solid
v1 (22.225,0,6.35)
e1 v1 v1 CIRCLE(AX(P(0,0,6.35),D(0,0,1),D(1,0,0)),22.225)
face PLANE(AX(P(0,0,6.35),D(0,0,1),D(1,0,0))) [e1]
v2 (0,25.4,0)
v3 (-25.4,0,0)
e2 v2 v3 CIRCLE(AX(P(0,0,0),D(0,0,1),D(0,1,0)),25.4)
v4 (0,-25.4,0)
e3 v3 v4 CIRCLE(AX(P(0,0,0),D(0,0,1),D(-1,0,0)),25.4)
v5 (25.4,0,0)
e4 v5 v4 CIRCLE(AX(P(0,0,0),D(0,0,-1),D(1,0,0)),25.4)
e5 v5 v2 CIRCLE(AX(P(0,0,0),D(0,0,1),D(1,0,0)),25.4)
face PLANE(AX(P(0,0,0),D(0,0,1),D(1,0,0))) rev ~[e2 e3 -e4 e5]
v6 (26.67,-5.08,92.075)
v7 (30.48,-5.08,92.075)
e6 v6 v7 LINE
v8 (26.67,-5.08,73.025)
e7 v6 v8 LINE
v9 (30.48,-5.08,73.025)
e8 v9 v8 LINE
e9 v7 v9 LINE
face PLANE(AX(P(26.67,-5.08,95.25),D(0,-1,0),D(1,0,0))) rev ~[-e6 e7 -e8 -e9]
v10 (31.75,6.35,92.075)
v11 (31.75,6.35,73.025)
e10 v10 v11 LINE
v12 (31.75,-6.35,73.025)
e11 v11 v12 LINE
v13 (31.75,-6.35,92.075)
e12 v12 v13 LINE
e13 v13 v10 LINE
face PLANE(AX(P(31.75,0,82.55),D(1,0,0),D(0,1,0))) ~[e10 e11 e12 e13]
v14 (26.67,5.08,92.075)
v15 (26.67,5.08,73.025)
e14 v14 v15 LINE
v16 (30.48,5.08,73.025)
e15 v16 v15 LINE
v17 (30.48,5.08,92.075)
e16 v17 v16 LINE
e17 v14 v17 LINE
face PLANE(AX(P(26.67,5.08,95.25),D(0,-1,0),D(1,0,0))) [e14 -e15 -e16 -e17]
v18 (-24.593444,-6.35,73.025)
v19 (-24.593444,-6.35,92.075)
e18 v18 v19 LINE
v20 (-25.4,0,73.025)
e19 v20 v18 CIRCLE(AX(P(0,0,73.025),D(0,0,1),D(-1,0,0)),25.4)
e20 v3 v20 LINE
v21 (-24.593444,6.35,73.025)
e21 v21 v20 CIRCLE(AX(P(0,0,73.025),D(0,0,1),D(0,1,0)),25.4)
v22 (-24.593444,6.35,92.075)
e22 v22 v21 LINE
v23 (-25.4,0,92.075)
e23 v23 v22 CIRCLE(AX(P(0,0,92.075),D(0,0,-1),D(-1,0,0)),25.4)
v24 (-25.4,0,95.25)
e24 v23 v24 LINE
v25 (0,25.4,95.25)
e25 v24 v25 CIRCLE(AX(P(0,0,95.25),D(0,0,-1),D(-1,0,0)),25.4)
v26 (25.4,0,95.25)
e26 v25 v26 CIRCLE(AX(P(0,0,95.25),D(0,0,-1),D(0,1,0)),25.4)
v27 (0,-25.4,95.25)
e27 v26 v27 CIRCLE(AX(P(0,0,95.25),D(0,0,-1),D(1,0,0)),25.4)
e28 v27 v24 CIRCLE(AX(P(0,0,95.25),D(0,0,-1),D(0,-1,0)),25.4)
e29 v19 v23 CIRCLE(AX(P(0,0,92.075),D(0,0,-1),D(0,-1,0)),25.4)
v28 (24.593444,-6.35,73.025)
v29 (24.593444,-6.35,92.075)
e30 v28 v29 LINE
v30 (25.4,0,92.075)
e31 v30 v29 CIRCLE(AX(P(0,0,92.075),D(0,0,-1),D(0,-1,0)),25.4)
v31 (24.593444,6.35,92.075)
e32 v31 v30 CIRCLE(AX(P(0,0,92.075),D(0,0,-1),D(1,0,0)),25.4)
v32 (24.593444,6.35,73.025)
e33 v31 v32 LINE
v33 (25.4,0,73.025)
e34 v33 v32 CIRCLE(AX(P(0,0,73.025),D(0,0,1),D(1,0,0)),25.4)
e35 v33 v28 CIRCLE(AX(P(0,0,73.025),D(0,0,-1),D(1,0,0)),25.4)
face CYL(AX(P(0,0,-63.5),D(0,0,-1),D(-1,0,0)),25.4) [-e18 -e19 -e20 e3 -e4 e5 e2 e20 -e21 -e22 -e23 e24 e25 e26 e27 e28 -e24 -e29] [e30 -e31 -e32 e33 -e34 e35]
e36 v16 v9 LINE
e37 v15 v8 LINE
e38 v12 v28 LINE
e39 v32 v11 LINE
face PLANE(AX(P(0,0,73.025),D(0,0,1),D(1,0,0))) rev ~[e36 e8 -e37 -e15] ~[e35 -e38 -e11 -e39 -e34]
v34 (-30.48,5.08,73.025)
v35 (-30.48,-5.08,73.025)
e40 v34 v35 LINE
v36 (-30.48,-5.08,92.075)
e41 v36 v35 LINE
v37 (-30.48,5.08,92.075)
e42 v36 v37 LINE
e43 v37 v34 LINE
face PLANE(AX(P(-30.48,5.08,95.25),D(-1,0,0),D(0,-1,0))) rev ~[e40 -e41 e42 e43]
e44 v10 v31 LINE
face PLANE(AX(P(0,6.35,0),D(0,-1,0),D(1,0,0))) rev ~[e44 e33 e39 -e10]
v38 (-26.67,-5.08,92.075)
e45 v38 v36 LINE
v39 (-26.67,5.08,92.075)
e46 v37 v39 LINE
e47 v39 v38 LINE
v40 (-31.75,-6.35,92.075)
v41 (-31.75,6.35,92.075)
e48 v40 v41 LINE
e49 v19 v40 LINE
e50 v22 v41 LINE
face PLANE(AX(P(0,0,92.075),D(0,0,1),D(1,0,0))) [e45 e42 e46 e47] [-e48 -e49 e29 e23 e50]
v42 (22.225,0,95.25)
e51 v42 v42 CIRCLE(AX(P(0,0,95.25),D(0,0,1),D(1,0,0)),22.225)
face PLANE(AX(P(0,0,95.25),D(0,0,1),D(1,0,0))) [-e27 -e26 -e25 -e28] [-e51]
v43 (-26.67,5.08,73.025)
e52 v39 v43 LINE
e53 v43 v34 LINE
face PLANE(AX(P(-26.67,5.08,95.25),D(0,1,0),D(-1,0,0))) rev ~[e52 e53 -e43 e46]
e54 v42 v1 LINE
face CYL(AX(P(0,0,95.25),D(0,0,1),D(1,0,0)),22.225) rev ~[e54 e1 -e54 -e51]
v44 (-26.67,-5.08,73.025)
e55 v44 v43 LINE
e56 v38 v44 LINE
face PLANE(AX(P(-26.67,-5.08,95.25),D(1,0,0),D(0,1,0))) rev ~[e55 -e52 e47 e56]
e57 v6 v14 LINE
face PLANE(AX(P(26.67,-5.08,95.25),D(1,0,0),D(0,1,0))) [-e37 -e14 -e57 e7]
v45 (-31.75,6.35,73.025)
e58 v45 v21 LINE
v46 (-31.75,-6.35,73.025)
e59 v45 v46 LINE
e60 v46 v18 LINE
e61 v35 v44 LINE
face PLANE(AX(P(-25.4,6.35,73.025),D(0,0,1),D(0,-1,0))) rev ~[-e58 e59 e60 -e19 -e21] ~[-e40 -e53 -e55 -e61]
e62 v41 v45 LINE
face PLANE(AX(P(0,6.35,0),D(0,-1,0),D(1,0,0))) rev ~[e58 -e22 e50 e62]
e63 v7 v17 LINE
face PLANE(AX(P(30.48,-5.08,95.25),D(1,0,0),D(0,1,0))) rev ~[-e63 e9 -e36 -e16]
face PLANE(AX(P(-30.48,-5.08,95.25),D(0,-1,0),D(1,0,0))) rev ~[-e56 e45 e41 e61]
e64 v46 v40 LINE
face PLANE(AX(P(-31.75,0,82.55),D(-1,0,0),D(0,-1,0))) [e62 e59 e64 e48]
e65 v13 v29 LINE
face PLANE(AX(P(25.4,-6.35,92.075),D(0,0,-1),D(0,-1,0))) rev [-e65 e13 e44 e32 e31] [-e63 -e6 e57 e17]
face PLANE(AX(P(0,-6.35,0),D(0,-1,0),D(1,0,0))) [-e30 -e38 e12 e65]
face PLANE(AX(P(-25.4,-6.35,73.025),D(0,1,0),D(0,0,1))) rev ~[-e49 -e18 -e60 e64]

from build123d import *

# Parameters (mm, degrees)
F0_W          = 50.8
F0_H          = 50.8
F1_DEPTH      = 95.25
F3_DEPTH      = 6.35
F5_W          = 3.81
F5_H          = 10.16
F6_DEPTH      = 25.4
F7_T4_DEPTH   = 222.25
F7_T10_DEPTH  = 222.25
F7_T16_DEPTH  = 222.25
F7_T23_DEPTH  = 222.25
F7_T29_DEPTH  = 222.25
F7_T35_DEPTH  = 222.25
F7_T41_DEPTH  = 222.25
F7_T47_DEPTH  = 222.25
F7_T54_DEPTH  = 222.25
F7_T60_DEPTH  = 222.25
F7_T66_DEPTH  = 222.25
F7_T72_DEPTH  = 222.25
F7_T78_DEPTH  = 222.25
F7_T85_DEPTH  = 222.25
F7_T91_DEPTH  = 222.25
F7_T97_DEPTH  = 222.25
F7_T103_DEPTH = 222.25
F7_T109_DEPTH = 222.25
F7_T116_DEPTH = 222.25
F7_T122_DEPTH = 222.25
F8_R          = 22.225
F9_DEPTH      = 88.9


# Not quite as in the source:
# - a fillet or chamfer that OpenCascade refuses, or shapes differently, is made with other operations: its cross-section is extruded or revolved along the edge and cut away or added


with BuildPart() as f1:
    # F0 (on Top) → F1 (new body)
    with BuildSketch(Plane.XY):
        Rectangle(F0_W, F0_H)
    extrude(amount=F1_DEPTH)

    # F2 (on face) → F3 (join)
    with BuildSketch(Plane(origin=(-25.4, 0, 0), x_dir=(0, -1, 0), z_dir=(-1, 0, 0))):
        Polygon((-6.35, 73.025), (6.35, 73.025), (6.35, 92.075), (0, 92.075), (-6.35, 92.075), align=None)
    extrude(amount=F3_DEPTH)

    # F4: F1 across plane


with BuildPart() as f1_1:
    add(f1.part)
    add(f1.part.mirror(Plane.YZ))

    # F5 (on face) → F6 (cut)
    with BuildSketch(Plane.XY.offset(95.25)):
        Polygon((-26.67, -5.08), (-26.67, 0), (-28.575, 0), (-30.48, 0), (-30.48, -5.08), align=None)
        Polygon((-28.575, 0), (-26.67, 0), (-26.67, 5.08), (-30.48, 5.08), (-30.48, 0), align=None)
        with Locations((28.575, 0)):
            Rectangle(F5_W, F5_H)
    extrude(amount=-F6_DEPTH, mode=Mode.SUBTRACT)

    # F7: fillet of radius 25.4 on 4 edges, made by hand


with BuildPart() as f7_tool2:
    # F7_s3 → F7_t4 (new body)
    with BuildSketch(Plane.XY.offset(-63.5)):
        with BuildLine():
            ThreePointArc((0, -25.4), (-17.9605122421, -17.9605122421), (-25.4, 0))
            Line((-25.4, 0), (-25.4, -25.4))
            Line((-25.4, -25.4), (0, -25.4))
        make_face()
    extrude(amount=F7_T4_DEPTH)

    split(bisect_by=Plane.XZ.offset(6.35), keep=Keep.TOP)

    split(bisect_by=Plane.XY.offset(73.025), keep=Keep.BOTTOM)


with BuildPart() as f1_2:
    add(f1_1.part)

    # F7_t1: cut F7_tool2
    add(f7_tool2.part, mode=Mode.SUBTRACT)


with BuildPart() as f7_tool8:
    # F7_s9 → F7_t10 (new body)
    with BuildSketch(Plane.XY.offset(-63.5)):
        with BuildLine():
            ThreePointArc((0, -25.4), (-17.9605122421, -17.9605122421), (-25.4, 0))
            Line((-25.4, 0), (-25.4, -25.4))
            Line((-25.4, -25.4), (0, -25.4))
        make_face()
    extrude(amount=F7_T10_DEPTH)

    split(bisect_by=Plane.XZ.offset(6.35), keep=Keep.BOTTOM)

    split(bisect_by=Plane.XY.offset(73.025), keep=Keep.BOTTOM)


with BuildPart() as f1_3:
    add(f1_2.part)

    # F7_t7: cut F7_tool8
    add(f7_tool8.part, mode=Mode.SUBTRACT)


with BuildPart() as f7_tool14:
    # F7_s15 → F7_t16 (new body)
    with BuildSketch(Plane.XY.offset(-63.5)):
        with BuildLine():
            ThreePointArc((0, -25.4), (-17.9605122421, -17.9605122421), (-25.4, 0))
            Line((-25.4, 0), (-25.4, -25.4))
            Line((-25.4, -25.4), (0, -25.4))
        make_face()
    extrude(amount=F7_T16_DEPTH)

    split(bisect_by=Plane.XY.offset(92.075), keep=Keep.BOTTOM)

    split(bisect_by=Plane.XZ.offset(6.35), keep=Keep.TOP)

    split(bisect_by=Plane.XY.offset(73.025), keep=Keep.TOP)


with BuildPart() as f1_4:
    add(f1_3.part)

    # F7_t13: cut F7_tool14
    add(f7_tool14.part, mode=Mode.SUBTRACT)


with BuildPart() as f7_tool21:
    # F7_s22 → F7_t23 (new body)
    with BuildSketch(Plane.XY.offset(-63.5)):
        with BuildLine():
            ThreePointArc((0, -25.4), (-17.9605122421, -17.9605122421), (-25.4, 0))
            Line((-25.4, 0), (-25.4, -25.4))
            Line((-25.4, -25.4), (0, -25.4))
        make_face()
    extrude(amount=F7_T23_DEPTH)

    split(bisect_by=Plane.XY.offset(92.075), keep=Keep.TOP)

    split(bisect_by=Plane.XZ.offset(6.35), keep=Keep.TOP)


with BuildPart() as f1_5:
    add(f1_4.part)

    # F7_t20: cut F7_tool21
    add(f7_tool21.part, mode=Mode.SUBTRACT)


with BuildPart() as f7_tool27:
    # F7_s28 → F7_t29 (new body)
    with BuildSketch(Plane.XY.offset(-63.5)):
        with BuildLine():
            ThreePointArc((0, -25.4), (-17.9605122421, -17.9605122421), (-25.4, 0))
            Line((-25.4, 0), (-25.4, -25.4))
            Line((-25.4, -25.4), (0, -25.4))
        make_face()
    extrude(amount=F7_T29_DEPTH)

    split(bisect_by=Plane.XY.offset(92.075), keep=Keep.TOP)

    split(bisect_by=Plane.XZ.offset(6.35), keep=Keep.BOTTOM)


with BuildPart() as f1_6:
    add(f1_5.part)

    # F7_t26: cut F7_tool27
    add(f7_tool27.part, mode=Mode.SUBTRACT)


with BuildPart() as f7_tool33:
    # F7_s34 → F7_t35 (new body)
    with BuildSketch(Plane.XY.offset(-63.5)):
        with BuildLine():
            ThreePointArc((0, -25.4), (17.9605122421, -17.9605122421), (25.4, 0))
            Line((25.4, 0), (25.4, -25.4))
            Line((25.4, -25.4), (0, -25.4))
        make_face()
    extrude(amount=F7_T35_DEPTH)

    split(bisect_by=Plane.XY.offset(73.025), keep=Keep.BOTTOM)

    split(bisect_by=Plane.XZ.offset(6.35), keep=Keep.TOP)


with BuildPart() as f1_7:
    add(f1_6.part)

    # F7_t32: cut F7_tool33
    add(f7_tool33.part, mode=Mode.SUBTRACT)


with BuildPart() as f7_tool39:
    # F7_s40 → F7_t41 (new body)
    with BuildSketch(Plane.XY.offset(-63.5)):
        with BuildLine():
            ThreePointArc((0, -25.4), (17.9605122421, -17.9605122421), (25.4, 0))
            Line((25.4, 0), (25.4, -25.4))
            Line((25.4, -25.4), (0, -25.4))
        make_face()
    extrude(amount=F7_T41_DEPTH)

    split(bisect_by=Plane.XY.offset(73.025), keep=Keep.BOTTOM)

    split(bisect_by=Plane.XZ.offset(6.35), keep=Keep.BOTTOM)


with BuildPart() as f1_8:
    add(f1_7.part)

    # F7_t38: cut F7_tool39
    add(f7_tool39.part, mode=Mode.SUBTRACT)


with BuildPart() as f7_tool45:
    # F7_s46 → F7_t47 (new body)
    with BuildSketch(Plane.XY.offset(-63.5)):
        with BuildLine():
            ThreePointArc((0, -25.4), (17.9605122421, -17.9605122421), (25.4, 0))
            Line((25.4, 0), (25.4, -25.4))
            Line((25.4, -25.4), (0, -25.4))
        make_face()
    extrude(amount=F7_T47_DEPTH)

    split(bisect_by=Plane.XY.offset(73.025), keep=Keep.TOP)

    split(bisect_by=Plane.XZ.offset(6.35), keep=Keep.TOP)

    split(bisect_by=Plane.XY.offset(92.075), keep=Keep.BOTTOM)


with BuildPart() as f1_9:
    add(f1_8.part)

    # F7_t44: cut F7_tool45
    add(f7_tool45.part, mode=Mode.SUBTRACT)


with BuildPart() as f7_tool52:
    # F7_s53 → F7_t54 (new body)
    with BuildSketch(Plane.XY.offset(-63.5)):
        with BuildLine():
            ThreePointArc((0, -25.4), (17.9605122421, -17.9605122421), (25.4, 0))
            Line((25.4, 0), (25.4, -25.4))
            Line((25.4, -25.4), (0, -25.4))
        make_face()
    extrude(amount=F7_T54_DEPTH)

    split(bisect_by=Plane.XZ.offset(6.35), keep=Keep.TOP)

    split(bisect_by=Plane.XY.offset(92.075), keep=Keep.TOP)


with BuildPart() as f1_10:
    add(f1_9.part)

    # F7_t51: cut F7_tool52
    add(f7_tool52.part, mode=Mode.SUBTRACT)


with BuildPart() as f7_tool58:
    # F7_s59 → F7_t60 (new body)
    with BuildSketch(Plane.XY.offset(-63.5)):
        with BuildLine():
            ThreePointArc((0, -25.4), (17.9605122421, -17.9605122421), (25.4, 0))
            Line((25.4, 0), (25.4, -25.4))
            Line((25.4, -25.4), (0, -25.4))
        make_face()
    extrude(amount=F7_T60_DEPTH)

    split(bisect_by=Plane.XZ.offset(6.35), keep=Keep.BOTTOM)

    split(bisect_by=Plane.XY.offset(92.075), keep=Keep.TOP)


with BuildPart() as f1_11:
    add(f1_10.part)

    # F7_t57: cut F7_tool58
    add(f7_tool58.part, mode=Mode.SUBTRACT)


with BuildPart() as f7_tool64:
    # F7_s65 → F7_t66 (new body)
    with BuildSketch(Plane.XY.offset(-63.5)):
        with BuildLine():
            ThreePointArc((25.4, 0), (17.9605122421, 17.9605122421), (0, 25.4))
            Line((0, 25.4), (25.4, 25.4))
            Line((25.4, 25.4), (25.4, 0))
        make_face()
    extrude(amount=F7_T66_DEPTH)

    split(bisect_by=Plane.XZ.offset(-6.35), keep=Keep.TOP)

    split(bisect_by=Plane.XY.offset(73.025), keep=Keep.BOTTOM)


with BuildPart() as f1_12:
    add(f1_11.part)

    # F7_t63: cut F7_tool64
    add(f7_tool64.part, mode=Mode.SUBTRACT)


with BuildPart() as f7_tool70:
    # F7_s71 → F7_t72 (new body)
    with BuildSketch(Plane.XY.offset(-63.5)):
        with BuildLine():
            ThreePointArc((25.4, 0), (17.9605122421, 17.9605122421), (0, 25.4))
            Line((0, 25.4), (25.4, 25.4))
            Line((25.4, 25.4), (25.4, 0))
        make_face()
    extrude(amount=F7_T72_DEPTH)

    split(bisect_by=Plane.XZ.offset(-6.35), keep=Keep.BOTTOM)

    split(bisect_by=Plane.XY.offset(73.025), keep=Keep.BOTTOM)


with BuildPart() as f1_13:
    add(f1_12.part)

    # F7_t69: cut F7_tool70
    add(f7_tool70.part, mode=Mode.SUBTRACT)


with BuildPart() as f7_tool76:
    # F7_s77 → F7_t78 (new body)
    with BuildSketch(Plane.XY.offset(-63.5)):
        with BuildLine():
            ThreePointArc((25.4, 0), (17.9605122421, 17.9605122421), (0, 25.4))
            Line((0, 25.4), (25.4, 25.4))
            Line((25.4, 25.4), (25.4, 0))
        make_face()
    extrude(amount=F7_T78_DEPTH)

    split(bisect_by=Plane.XZ.offset(-6.35), keep=Keep.BOTTOM)

    split(bisect_by=Plane.XY.offset(73.025), keep=Keep.TOP)

    split(bisect_by=Plane.XY.offset(92.075), keep=Keep.BOTTOM)


with BuildPart() as f1_14:
    add(f1_13.part)

    # F7_t75: cut F7_tool76
    add(f7_tool76.part, mode=Mode.SUBTRACT)


with BuildPart() as f7_tool83:
    # F7_s84 → F7_t85 (new body)
    with BuildSketch(Plane.XY.offset(-63.5)):
        with BuildLine():
            ThreePointArc((25.4, 0), (17.9605122421, 17.9605122421), (0, 25.4))
            Line((0, 25.4), (25.4, 25.4))
            Line((25.4, 25.4), (25.4, 0))
        make_face()
    extrude(amount=F7_T85_DEPTH)

    split(bisect_by=Plane.XZ.offset(-6.35), keep=Keep.TOP)

    split(bisect_by=Plane.XY.offset(92.075), keep=Keep.TOP)


with BuildPart() as f1_15:
    add(f1_14.part)

    # F7_t82: cut F7_tool83
    add(f7_tool83.part, mode=Mode.SUBTRACT)


with BuildPart() as f7_tool89:
    # F7_s90 → F7_t91 (new body)
    with BuildSketch(Plane.XY.offset(-63.5)):
        with BuildLine():
            ThreePointArc((25.4, 0), (17.9605122421, 17.9605122421), (0, 25.4))
            Line((0, 25.4), (25.4, 25.4))
            Line((25.4, 25.4), (25.4, 0))
        make_face()
    extrude(amount=F7_T91_DEPTH)

    split(bisect_by=Plane.XZ.offset(-6.35), keep=Keep.BOTTOM)

    split(bisect_by=Plane.XY.offset(92.075), keep=Keep.TOP)


with BuildPart() as f1_16:
    add(f1_15.part)

    # F7_t88: cut F7_tool89
    add(f7_tool89.part, mode=Mode.SUBTRACT)


with BuildPart() as f7_tool95:
    # F7_s96 → F7_t97 (new body)
    with BuildSketch(Plane.XY.offset(-63.5)):
        with BuildLine():
            ThreePointArc((-25.4, 0), (-17.9605122421, 17.9605122421), (0, 25.4))
            Line((0, 25.4), (-25.4, 25.4))
            Line((-25.4, 25.4), (-25.4, 0))
        make_face()
    extrude(amount=F7_T97_DEPTH)

    split(bisect_by=Plane.XZ.offset(-6.35), keep=Keep.TOP)

    split(bisect_by=Plane.XY.offset(73.025), keep=Keep.BOTTOM)


with BuildPart() as f1_17:
    add(f1_16.part)

    # F7_t94: cut F7_tool95
    add(f7_tool95.part, mode=Mode.SUBTRACT)


with BuildPart() as f7_tool101:
    # F7_s102 → F7_t103 (new body)
    with BuildSketch(Plane.XY.offset(-63.5)):
        with BuildLine():
            ThreePointArc((-25.4, 0), (-17.9605122421, 17.9605122421), (0, 25.4))
            Line((0, 25.4), (-25.4, 25.4))
            Line((-25.4, 25.4), (-25.4, 0))
        make_face()
    extrude(amount=F7_T103_DEPTH)

    split(bisect_by=Plane.XZ.offset(-6.35), keep=Keep.BOTTOM)

    split(bisect_by=Plane.XY.offset(73.025), keep=Keep.BOTTOM)


with BuildPart() as f1_18:
    add(f1_17.part)

    # F7_t100: cut F7_tool101
    add(f7_tool101.part, mode=Mode.SUBTRACT)


with BuildPart() as f7_tool107:
    # F7_s108 → F7_t109 (new body)
    with BuildSketch(Plane.XY.offset(-63.5)):
        with BuildLine():
            ThreePointArc((-25.4, 0), (-17.9605122421, 17.9605122421), (0, 25.4))
            Line((0, 25.4), (-25.4, 25.4))
            Line((-25.4, 25.4), (-25.4, 0))
        make_face()
    extrude(amount=F7_T109_DEPTH)

    split(bisect_by=Plane.XZ.offset(-6.35), keep=Keep.BOTTOM)

    split(bisect_by=Plane.XY.offset(92.075), keep=Keep.BOTTOM)

    split(bisect_by=Plane.XY.offset(73.025), keep=Keep.TOP)


with BuildPart() as f1_19:
    add(f1_18.part)

    # F7_t106: cut F7_tool107
    add(f7_tool107.part, mode=Mode.SUBTRACT)


with BuildPart() as f7_tool114:
    # F7_s115 → F7_t116 (new body)
    with BuildSketch(Plane.XY.offset(-63.5)):
        with BuildLine():
            ThreePointArc((-25.4, 0), (-17.9605122421, 17.9605122421), (0, 25.4))
            Line((0, 25.4), (-25.4, 25.4))
            Line((-25.4, 25.4), (-25.4, 0))
        make_face()
    extrude(amount=F7_T116_DEPTH)

    split(bisect_by=Plane.XZ.offset(-6.35), keep=Keep.TOP)

    split(bisect_by=Plane.XY.offset(92.075), keep=Keep.TOP)


with BuildPart() as f1_20:
    add(f1_19.part)

    # F7_t113: cut F7_tool114
    add(f7_tool114.part, mode=Mode.SUBTRACT)


with BuildPart() as f7_tool120:
    # F7_s121 → F7_t122 (new body)
    with BuildSketch(Plane.XY.offset(-63.5)):
        with BuildLine():
            ThreePointArc((-25.4, 0), (-17.9605122421, 17.9605122421), (0, 25.4))
            Line((0, 25.4), (-25.4, 25.4))
            Line((-25.4, 25.4), (-25.4, 0))
        make_face()
    extrude(amount=F7_T122_DEPTH)

    split(bisect_by=Plane.XZ.offset(-6.35), keep=Keep.BOTTOM)

    split(bisect_by=Plane.XY.offset(92.075), keep=Keep.TOP)


with BuildPart() as f1_21:
    add(f1_20.part)

    # F7_t119: cut F7_tool120
    add(f7_tool120.part, mode=Mode.SUBTRACT)

    # F8 (on face) → F9 (cut)
    with BuildSketch(Plane.XY.offset(95.25)):
        Circle(F8_R)
    extrude(amount=-F9_DEPTH, mode=Mode.SUBTRACT)


solid = f1_21.part
